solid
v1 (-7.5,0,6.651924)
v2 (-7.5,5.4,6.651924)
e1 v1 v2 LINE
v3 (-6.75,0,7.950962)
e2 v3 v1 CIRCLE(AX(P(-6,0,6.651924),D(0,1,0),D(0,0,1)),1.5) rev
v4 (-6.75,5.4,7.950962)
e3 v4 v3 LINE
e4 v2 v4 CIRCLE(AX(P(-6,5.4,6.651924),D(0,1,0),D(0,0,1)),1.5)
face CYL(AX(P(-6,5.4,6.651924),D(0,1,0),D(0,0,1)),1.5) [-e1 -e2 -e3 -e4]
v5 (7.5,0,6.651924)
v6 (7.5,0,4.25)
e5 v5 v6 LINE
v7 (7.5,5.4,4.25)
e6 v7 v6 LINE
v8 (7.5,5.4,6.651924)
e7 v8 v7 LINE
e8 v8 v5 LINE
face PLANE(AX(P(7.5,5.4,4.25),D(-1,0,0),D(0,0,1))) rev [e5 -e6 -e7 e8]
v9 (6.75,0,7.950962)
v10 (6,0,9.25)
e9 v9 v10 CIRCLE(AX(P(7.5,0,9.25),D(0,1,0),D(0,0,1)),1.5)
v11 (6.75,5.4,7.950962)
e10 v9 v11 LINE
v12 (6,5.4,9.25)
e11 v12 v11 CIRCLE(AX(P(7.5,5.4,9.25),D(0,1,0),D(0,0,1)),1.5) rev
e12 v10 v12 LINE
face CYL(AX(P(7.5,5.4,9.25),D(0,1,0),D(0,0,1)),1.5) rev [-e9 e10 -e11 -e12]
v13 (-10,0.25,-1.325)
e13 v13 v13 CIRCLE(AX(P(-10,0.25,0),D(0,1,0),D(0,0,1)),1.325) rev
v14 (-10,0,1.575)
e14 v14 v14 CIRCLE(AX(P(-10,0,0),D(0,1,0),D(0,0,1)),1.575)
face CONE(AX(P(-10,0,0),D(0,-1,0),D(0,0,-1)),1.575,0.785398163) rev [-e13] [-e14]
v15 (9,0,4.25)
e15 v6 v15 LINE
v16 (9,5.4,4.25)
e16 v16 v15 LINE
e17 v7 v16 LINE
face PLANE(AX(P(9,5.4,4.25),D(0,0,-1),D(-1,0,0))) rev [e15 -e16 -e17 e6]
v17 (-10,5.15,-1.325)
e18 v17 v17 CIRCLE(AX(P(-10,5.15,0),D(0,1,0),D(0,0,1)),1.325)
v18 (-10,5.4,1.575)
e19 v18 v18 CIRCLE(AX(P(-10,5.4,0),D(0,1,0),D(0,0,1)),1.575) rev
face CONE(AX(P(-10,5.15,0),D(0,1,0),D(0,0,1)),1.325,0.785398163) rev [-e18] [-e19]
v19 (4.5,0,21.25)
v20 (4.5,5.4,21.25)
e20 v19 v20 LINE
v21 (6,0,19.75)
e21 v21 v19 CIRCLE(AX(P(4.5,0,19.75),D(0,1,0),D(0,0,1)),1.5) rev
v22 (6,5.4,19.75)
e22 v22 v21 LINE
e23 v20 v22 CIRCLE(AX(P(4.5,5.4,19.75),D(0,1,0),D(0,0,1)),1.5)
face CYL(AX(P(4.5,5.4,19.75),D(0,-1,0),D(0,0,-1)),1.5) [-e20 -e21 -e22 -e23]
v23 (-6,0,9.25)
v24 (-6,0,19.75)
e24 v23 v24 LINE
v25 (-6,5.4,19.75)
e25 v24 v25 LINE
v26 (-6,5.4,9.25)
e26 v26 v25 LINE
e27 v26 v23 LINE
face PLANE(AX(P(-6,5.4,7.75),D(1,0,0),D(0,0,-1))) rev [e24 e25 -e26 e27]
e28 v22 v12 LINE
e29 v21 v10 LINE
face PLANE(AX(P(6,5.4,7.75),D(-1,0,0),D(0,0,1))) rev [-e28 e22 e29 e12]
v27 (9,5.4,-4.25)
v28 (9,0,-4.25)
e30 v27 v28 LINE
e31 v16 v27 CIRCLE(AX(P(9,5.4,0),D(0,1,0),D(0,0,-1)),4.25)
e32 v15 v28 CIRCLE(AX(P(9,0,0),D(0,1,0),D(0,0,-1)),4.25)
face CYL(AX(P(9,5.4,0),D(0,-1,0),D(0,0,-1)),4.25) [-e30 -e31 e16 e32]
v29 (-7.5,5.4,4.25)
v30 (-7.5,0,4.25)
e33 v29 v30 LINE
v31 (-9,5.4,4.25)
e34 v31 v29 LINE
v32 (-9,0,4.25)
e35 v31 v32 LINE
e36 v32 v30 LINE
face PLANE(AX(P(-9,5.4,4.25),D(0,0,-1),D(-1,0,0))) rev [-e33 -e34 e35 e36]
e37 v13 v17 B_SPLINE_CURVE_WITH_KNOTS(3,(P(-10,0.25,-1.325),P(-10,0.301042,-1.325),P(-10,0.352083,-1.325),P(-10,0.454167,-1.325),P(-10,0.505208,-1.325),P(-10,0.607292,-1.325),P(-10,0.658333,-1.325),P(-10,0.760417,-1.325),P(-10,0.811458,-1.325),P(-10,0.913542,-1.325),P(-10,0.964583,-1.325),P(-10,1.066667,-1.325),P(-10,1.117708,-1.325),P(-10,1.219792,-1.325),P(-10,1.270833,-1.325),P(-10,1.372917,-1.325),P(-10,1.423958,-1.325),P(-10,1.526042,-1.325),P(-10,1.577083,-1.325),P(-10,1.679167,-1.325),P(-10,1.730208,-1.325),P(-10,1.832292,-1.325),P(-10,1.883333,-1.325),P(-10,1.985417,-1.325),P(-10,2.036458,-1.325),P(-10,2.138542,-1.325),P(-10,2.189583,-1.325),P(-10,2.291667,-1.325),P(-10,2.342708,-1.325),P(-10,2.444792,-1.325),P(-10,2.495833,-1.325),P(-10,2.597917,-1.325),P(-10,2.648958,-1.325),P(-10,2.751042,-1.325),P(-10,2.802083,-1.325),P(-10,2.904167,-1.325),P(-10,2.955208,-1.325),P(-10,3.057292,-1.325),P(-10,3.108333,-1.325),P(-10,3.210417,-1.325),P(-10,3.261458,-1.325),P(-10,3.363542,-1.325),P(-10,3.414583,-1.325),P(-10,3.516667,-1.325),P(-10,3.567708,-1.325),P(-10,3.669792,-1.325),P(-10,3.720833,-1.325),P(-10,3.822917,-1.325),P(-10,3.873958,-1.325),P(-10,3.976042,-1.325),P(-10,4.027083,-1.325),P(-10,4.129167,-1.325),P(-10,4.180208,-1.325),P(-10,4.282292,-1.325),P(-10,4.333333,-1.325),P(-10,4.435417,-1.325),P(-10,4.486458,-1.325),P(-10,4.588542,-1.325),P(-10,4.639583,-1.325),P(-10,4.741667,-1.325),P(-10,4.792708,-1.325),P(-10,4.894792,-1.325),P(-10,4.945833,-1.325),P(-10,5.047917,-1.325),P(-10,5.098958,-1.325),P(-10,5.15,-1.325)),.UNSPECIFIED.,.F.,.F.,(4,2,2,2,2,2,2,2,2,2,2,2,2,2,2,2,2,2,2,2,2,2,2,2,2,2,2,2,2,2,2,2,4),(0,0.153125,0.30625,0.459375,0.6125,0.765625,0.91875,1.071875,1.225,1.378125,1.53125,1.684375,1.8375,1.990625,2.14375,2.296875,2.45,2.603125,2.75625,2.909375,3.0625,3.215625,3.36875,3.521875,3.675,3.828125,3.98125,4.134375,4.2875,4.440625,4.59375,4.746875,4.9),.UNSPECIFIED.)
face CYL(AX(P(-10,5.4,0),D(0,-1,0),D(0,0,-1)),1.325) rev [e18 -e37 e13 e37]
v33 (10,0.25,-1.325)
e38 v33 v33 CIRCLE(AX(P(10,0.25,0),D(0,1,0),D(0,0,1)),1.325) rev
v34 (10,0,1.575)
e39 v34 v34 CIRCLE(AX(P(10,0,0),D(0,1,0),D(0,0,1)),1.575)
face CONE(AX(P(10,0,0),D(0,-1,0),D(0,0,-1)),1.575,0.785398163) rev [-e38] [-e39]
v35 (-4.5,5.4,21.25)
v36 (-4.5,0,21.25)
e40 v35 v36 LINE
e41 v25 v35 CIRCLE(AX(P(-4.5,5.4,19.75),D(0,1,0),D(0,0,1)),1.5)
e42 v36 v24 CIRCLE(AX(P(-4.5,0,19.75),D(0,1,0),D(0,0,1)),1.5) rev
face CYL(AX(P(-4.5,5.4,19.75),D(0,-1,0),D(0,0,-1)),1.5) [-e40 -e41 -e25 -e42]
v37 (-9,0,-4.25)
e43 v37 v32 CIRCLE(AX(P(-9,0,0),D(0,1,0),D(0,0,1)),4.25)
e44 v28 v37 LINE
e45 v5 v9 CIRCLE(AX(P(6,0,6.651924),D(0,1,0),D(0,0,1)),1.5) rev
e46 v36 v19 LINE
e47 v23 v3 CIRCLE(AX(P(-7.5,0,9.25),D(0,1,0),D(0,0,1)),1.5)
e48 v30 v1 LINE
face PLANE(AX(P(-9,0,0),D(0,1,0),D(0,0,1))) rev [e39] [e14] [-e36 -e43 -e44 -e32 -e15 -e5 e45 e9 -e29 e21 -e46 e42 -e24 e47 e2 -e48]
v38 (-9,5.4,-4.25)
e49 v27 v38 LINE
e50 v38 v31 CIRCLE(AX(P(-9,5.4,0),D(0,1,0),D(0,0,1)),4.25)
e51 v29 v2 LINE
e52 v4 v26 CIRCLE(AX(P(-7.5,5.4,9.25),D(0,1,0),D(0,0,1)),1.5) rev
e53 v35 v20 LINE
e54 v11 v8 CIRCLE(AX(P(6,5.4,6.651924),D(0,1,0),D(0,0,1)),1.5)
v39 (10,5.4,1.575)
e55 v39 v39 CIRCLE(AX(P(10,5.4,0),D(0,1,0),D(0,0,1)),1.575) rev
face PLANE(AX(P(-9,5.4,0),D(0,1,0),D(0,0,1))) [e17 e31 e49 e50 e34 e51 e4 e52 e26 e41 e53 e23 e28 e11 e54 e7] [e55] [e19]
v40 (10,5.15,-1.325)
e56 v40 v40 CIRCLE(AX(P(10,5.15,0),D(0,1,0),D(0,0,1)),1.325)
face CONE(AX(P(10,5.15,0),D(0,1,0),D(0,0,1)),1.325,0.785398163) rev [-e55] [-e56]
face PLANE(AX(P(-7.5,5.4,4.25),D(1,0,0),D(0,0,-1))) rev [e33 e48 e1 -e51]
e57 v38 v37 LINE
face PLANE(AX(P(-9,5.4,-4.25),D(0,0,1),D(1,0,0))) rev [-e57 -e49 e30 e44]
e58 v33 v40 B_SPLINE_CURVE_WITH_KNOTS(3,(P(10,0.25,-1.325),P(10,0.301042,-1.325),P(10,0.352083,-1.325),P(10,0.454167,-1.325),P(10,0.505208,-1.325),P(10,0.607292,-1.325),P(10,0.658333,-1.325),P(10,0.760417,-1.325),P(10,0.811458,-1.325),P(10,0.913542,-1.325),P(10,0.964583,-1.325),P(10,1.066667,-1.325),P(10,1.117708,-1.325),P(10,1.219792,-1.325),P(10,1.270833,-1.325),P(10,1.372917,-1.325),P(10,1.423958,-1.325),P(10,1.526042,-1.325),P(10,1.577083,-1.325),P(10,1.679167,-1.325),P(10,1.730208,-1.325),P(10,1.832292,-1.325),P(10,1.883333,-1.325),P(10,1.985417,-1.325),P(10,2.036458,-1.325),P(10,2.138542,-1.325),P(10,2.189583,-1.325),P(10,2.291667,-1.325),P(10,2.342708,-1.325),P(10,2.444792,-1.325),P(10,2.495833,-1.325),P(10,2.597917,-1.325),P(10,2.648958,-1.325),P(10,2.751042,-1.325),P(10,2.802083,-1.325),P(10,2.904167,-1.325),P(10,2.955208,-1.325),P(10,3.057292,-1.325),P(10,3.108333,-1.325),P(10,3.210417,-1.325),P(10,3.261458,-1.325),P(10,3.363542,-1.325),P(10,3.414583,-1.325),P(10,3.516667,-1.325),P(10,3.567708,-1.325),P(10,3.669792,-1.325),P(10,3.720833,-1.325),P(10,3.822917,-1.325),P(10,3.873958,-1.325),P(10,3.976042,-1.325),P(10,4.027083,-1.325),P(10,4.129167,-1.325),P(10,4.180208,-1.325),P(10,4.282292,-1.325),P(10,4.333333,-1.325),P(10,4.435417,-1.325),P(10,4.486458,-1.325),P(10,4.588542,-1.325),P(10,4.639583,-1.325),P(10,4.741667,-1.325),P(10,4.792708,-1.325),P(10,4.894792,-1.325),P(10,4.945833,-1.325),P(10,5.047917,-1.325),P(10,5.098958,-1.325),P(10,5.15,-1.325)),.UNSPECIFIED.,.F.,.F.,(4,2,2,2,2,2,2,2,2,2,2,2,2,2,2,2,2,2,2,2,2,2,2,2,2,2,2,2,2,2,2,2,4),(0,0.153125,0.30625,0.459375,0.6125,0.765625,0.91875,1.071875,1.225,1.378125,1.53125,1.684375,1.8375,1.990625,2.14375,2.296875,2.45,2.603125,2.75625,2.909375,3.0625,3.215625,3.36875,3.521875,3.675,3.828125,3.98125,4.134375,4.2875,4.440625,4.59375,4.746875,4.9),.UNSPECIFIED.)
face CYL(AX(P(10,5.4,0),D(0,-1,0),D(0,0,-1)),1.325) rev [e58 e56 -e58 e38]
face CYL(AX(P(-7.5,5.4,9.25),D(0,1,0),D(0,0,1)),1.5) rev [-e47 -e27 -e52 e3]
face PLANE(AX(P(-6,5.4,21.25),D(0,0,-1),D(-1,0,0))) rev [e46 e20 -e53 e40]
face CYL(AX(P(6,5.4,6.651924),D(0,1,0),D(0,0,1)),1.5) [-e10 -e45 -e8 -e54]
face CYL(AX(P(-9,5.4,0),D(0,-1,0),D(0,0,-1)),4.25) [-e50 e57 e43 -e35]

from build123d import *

# Parameters (mm, degrees)
SKETCH1_R           = 1.325
BOSS_EXTRUDE1_DEPTH = 5.4
CHAMFER2_SIZE       = 0.25
FILLET4_START       = -1
FILLET4_DEPTH       = 7
FILLET4_2_DEPTH     = 5.4
FILLET5_R           = 1.5


with BuildPart() as part:
    # Sketch1 → Boss-Extrude1 (new body)
    with BuildSketch(Plane(origin=(0, 0, 0), x_dir=(1, 0, 0), z_dir=(0, 1, 0))):
        with BuildLine():
            Line((-6, -7.75), (-6, -21.25))
            Line((-6, -21.25), (6, -21.25))
            Line((6, -21.25), (6, -7.75))
            Line((6, -7.75), (7.5, -7.75))
            Line((7.5, -7.75), (7.5, -4.25))
            Line((7.5, -4.25), (9, -4.25))
            ThreePointArc((9, -4.25), (13.25, 0), (9, 4.25))
            Line((9, 4.25), (-9, 4.25))
            ThreePointArc((-9, 4.25), (-13.25, 0), (-9, -4.25))
            Line((-9, -4.25), (-7.5, -4.25))
            Line((-7.5, -4.25), (-7.5, -7.75))
            Line((-7.5, -7.75), (-6, -7.75))
        make_face()
        with Locations(Location((-10, 0, 0), (0, 0, 90))):
            Circle(SKETCH1_R, mode=Mode.SUBTRACT)
        with Locations(Location((10, 0, 0), (0, 0, 90))):
            Circle(SKETCH1_R, mode=Mode.SUBTRACT)
    extrude(amount=BOSS_EXTRUDE1_DEPTH)

    # Chamfer2
    chamfer2_edges = [part.edges().sort_by_distance(p)[0] for p in [
        (-10, 0, 1.325),
        (-10, 5.4, 1.325),
        (10, 0, 1.325),
        (10, 5.4, 1.325),
    ]]
    chamfer(chamfer2_edges, length=CHAMFER2_SIZE)

    # Fillet4: read off the stored shape, not the designer's step
    # Fillet4 outline → Fillet4 (cut)
    with BuildSketch(Plane(origin=(0, 0, 0), x_dir=(1, 0, 0), z_dir=(0, 1, 0)).offset(FILLET4_START)):
        with BuildLine():
            ThreePointArc((6, -19.75), (5.560660172, -20.810660172), (4.5, -21.25))
            Line((4.5, -21.25), (6, -21.25))
            Line((6, -21.25), (6, -19.75))
        make_face()
        with BuildLine():
            ThreePointArc((-4.5, -21.25), (-5.560660172, -20.810660172), (-6, -19.75))
            Line((-6, -19.75), (-6, -21.25))
            Line((-6, -21.25), (-4.5, -21.25))
        make_face()
    extrude(amount=FILLET4_DEPTH, mode=Mode.SUBTRACT)

    # Fillet4 2 outline → Fillet4 2 (add)
    with BuildSketch(Plane(origin=(0, 0, 0), x_dir=(1, 0, 0), z_dir=(0, 1, 0))):
        with BuildLine():
            Line((6, -7.75), (6, -9.25))
            ThreePointArc((6, -9.25), (6.439339828, -8.189339828), (7.5, -7.75))
            Line((7.5, -7.75), (6, -7.75))
        make_face()
        with BuildLine():
            ThreePointArc((-7.5, -7.75), (-6.439339828, -8.189339828), (-6, -9.25))
            Line((-6, -9.25), (-6, -7.75))
            Line((-6, -7.75), (-7.5, -7.75))
        make_face()
    extrude(amount=FILLET4_2_DEPTH)

    # Fillet5
    fillet5_edges = [part.edges().sort_by_distance(p)[0] for p in [
        (7.5, 2.7, 7.75),
        (-7.5, 2.7, 7.75),
    ]]
    fillet(fillet5_edges, radius=FILLET5_R)


solid = part.part
